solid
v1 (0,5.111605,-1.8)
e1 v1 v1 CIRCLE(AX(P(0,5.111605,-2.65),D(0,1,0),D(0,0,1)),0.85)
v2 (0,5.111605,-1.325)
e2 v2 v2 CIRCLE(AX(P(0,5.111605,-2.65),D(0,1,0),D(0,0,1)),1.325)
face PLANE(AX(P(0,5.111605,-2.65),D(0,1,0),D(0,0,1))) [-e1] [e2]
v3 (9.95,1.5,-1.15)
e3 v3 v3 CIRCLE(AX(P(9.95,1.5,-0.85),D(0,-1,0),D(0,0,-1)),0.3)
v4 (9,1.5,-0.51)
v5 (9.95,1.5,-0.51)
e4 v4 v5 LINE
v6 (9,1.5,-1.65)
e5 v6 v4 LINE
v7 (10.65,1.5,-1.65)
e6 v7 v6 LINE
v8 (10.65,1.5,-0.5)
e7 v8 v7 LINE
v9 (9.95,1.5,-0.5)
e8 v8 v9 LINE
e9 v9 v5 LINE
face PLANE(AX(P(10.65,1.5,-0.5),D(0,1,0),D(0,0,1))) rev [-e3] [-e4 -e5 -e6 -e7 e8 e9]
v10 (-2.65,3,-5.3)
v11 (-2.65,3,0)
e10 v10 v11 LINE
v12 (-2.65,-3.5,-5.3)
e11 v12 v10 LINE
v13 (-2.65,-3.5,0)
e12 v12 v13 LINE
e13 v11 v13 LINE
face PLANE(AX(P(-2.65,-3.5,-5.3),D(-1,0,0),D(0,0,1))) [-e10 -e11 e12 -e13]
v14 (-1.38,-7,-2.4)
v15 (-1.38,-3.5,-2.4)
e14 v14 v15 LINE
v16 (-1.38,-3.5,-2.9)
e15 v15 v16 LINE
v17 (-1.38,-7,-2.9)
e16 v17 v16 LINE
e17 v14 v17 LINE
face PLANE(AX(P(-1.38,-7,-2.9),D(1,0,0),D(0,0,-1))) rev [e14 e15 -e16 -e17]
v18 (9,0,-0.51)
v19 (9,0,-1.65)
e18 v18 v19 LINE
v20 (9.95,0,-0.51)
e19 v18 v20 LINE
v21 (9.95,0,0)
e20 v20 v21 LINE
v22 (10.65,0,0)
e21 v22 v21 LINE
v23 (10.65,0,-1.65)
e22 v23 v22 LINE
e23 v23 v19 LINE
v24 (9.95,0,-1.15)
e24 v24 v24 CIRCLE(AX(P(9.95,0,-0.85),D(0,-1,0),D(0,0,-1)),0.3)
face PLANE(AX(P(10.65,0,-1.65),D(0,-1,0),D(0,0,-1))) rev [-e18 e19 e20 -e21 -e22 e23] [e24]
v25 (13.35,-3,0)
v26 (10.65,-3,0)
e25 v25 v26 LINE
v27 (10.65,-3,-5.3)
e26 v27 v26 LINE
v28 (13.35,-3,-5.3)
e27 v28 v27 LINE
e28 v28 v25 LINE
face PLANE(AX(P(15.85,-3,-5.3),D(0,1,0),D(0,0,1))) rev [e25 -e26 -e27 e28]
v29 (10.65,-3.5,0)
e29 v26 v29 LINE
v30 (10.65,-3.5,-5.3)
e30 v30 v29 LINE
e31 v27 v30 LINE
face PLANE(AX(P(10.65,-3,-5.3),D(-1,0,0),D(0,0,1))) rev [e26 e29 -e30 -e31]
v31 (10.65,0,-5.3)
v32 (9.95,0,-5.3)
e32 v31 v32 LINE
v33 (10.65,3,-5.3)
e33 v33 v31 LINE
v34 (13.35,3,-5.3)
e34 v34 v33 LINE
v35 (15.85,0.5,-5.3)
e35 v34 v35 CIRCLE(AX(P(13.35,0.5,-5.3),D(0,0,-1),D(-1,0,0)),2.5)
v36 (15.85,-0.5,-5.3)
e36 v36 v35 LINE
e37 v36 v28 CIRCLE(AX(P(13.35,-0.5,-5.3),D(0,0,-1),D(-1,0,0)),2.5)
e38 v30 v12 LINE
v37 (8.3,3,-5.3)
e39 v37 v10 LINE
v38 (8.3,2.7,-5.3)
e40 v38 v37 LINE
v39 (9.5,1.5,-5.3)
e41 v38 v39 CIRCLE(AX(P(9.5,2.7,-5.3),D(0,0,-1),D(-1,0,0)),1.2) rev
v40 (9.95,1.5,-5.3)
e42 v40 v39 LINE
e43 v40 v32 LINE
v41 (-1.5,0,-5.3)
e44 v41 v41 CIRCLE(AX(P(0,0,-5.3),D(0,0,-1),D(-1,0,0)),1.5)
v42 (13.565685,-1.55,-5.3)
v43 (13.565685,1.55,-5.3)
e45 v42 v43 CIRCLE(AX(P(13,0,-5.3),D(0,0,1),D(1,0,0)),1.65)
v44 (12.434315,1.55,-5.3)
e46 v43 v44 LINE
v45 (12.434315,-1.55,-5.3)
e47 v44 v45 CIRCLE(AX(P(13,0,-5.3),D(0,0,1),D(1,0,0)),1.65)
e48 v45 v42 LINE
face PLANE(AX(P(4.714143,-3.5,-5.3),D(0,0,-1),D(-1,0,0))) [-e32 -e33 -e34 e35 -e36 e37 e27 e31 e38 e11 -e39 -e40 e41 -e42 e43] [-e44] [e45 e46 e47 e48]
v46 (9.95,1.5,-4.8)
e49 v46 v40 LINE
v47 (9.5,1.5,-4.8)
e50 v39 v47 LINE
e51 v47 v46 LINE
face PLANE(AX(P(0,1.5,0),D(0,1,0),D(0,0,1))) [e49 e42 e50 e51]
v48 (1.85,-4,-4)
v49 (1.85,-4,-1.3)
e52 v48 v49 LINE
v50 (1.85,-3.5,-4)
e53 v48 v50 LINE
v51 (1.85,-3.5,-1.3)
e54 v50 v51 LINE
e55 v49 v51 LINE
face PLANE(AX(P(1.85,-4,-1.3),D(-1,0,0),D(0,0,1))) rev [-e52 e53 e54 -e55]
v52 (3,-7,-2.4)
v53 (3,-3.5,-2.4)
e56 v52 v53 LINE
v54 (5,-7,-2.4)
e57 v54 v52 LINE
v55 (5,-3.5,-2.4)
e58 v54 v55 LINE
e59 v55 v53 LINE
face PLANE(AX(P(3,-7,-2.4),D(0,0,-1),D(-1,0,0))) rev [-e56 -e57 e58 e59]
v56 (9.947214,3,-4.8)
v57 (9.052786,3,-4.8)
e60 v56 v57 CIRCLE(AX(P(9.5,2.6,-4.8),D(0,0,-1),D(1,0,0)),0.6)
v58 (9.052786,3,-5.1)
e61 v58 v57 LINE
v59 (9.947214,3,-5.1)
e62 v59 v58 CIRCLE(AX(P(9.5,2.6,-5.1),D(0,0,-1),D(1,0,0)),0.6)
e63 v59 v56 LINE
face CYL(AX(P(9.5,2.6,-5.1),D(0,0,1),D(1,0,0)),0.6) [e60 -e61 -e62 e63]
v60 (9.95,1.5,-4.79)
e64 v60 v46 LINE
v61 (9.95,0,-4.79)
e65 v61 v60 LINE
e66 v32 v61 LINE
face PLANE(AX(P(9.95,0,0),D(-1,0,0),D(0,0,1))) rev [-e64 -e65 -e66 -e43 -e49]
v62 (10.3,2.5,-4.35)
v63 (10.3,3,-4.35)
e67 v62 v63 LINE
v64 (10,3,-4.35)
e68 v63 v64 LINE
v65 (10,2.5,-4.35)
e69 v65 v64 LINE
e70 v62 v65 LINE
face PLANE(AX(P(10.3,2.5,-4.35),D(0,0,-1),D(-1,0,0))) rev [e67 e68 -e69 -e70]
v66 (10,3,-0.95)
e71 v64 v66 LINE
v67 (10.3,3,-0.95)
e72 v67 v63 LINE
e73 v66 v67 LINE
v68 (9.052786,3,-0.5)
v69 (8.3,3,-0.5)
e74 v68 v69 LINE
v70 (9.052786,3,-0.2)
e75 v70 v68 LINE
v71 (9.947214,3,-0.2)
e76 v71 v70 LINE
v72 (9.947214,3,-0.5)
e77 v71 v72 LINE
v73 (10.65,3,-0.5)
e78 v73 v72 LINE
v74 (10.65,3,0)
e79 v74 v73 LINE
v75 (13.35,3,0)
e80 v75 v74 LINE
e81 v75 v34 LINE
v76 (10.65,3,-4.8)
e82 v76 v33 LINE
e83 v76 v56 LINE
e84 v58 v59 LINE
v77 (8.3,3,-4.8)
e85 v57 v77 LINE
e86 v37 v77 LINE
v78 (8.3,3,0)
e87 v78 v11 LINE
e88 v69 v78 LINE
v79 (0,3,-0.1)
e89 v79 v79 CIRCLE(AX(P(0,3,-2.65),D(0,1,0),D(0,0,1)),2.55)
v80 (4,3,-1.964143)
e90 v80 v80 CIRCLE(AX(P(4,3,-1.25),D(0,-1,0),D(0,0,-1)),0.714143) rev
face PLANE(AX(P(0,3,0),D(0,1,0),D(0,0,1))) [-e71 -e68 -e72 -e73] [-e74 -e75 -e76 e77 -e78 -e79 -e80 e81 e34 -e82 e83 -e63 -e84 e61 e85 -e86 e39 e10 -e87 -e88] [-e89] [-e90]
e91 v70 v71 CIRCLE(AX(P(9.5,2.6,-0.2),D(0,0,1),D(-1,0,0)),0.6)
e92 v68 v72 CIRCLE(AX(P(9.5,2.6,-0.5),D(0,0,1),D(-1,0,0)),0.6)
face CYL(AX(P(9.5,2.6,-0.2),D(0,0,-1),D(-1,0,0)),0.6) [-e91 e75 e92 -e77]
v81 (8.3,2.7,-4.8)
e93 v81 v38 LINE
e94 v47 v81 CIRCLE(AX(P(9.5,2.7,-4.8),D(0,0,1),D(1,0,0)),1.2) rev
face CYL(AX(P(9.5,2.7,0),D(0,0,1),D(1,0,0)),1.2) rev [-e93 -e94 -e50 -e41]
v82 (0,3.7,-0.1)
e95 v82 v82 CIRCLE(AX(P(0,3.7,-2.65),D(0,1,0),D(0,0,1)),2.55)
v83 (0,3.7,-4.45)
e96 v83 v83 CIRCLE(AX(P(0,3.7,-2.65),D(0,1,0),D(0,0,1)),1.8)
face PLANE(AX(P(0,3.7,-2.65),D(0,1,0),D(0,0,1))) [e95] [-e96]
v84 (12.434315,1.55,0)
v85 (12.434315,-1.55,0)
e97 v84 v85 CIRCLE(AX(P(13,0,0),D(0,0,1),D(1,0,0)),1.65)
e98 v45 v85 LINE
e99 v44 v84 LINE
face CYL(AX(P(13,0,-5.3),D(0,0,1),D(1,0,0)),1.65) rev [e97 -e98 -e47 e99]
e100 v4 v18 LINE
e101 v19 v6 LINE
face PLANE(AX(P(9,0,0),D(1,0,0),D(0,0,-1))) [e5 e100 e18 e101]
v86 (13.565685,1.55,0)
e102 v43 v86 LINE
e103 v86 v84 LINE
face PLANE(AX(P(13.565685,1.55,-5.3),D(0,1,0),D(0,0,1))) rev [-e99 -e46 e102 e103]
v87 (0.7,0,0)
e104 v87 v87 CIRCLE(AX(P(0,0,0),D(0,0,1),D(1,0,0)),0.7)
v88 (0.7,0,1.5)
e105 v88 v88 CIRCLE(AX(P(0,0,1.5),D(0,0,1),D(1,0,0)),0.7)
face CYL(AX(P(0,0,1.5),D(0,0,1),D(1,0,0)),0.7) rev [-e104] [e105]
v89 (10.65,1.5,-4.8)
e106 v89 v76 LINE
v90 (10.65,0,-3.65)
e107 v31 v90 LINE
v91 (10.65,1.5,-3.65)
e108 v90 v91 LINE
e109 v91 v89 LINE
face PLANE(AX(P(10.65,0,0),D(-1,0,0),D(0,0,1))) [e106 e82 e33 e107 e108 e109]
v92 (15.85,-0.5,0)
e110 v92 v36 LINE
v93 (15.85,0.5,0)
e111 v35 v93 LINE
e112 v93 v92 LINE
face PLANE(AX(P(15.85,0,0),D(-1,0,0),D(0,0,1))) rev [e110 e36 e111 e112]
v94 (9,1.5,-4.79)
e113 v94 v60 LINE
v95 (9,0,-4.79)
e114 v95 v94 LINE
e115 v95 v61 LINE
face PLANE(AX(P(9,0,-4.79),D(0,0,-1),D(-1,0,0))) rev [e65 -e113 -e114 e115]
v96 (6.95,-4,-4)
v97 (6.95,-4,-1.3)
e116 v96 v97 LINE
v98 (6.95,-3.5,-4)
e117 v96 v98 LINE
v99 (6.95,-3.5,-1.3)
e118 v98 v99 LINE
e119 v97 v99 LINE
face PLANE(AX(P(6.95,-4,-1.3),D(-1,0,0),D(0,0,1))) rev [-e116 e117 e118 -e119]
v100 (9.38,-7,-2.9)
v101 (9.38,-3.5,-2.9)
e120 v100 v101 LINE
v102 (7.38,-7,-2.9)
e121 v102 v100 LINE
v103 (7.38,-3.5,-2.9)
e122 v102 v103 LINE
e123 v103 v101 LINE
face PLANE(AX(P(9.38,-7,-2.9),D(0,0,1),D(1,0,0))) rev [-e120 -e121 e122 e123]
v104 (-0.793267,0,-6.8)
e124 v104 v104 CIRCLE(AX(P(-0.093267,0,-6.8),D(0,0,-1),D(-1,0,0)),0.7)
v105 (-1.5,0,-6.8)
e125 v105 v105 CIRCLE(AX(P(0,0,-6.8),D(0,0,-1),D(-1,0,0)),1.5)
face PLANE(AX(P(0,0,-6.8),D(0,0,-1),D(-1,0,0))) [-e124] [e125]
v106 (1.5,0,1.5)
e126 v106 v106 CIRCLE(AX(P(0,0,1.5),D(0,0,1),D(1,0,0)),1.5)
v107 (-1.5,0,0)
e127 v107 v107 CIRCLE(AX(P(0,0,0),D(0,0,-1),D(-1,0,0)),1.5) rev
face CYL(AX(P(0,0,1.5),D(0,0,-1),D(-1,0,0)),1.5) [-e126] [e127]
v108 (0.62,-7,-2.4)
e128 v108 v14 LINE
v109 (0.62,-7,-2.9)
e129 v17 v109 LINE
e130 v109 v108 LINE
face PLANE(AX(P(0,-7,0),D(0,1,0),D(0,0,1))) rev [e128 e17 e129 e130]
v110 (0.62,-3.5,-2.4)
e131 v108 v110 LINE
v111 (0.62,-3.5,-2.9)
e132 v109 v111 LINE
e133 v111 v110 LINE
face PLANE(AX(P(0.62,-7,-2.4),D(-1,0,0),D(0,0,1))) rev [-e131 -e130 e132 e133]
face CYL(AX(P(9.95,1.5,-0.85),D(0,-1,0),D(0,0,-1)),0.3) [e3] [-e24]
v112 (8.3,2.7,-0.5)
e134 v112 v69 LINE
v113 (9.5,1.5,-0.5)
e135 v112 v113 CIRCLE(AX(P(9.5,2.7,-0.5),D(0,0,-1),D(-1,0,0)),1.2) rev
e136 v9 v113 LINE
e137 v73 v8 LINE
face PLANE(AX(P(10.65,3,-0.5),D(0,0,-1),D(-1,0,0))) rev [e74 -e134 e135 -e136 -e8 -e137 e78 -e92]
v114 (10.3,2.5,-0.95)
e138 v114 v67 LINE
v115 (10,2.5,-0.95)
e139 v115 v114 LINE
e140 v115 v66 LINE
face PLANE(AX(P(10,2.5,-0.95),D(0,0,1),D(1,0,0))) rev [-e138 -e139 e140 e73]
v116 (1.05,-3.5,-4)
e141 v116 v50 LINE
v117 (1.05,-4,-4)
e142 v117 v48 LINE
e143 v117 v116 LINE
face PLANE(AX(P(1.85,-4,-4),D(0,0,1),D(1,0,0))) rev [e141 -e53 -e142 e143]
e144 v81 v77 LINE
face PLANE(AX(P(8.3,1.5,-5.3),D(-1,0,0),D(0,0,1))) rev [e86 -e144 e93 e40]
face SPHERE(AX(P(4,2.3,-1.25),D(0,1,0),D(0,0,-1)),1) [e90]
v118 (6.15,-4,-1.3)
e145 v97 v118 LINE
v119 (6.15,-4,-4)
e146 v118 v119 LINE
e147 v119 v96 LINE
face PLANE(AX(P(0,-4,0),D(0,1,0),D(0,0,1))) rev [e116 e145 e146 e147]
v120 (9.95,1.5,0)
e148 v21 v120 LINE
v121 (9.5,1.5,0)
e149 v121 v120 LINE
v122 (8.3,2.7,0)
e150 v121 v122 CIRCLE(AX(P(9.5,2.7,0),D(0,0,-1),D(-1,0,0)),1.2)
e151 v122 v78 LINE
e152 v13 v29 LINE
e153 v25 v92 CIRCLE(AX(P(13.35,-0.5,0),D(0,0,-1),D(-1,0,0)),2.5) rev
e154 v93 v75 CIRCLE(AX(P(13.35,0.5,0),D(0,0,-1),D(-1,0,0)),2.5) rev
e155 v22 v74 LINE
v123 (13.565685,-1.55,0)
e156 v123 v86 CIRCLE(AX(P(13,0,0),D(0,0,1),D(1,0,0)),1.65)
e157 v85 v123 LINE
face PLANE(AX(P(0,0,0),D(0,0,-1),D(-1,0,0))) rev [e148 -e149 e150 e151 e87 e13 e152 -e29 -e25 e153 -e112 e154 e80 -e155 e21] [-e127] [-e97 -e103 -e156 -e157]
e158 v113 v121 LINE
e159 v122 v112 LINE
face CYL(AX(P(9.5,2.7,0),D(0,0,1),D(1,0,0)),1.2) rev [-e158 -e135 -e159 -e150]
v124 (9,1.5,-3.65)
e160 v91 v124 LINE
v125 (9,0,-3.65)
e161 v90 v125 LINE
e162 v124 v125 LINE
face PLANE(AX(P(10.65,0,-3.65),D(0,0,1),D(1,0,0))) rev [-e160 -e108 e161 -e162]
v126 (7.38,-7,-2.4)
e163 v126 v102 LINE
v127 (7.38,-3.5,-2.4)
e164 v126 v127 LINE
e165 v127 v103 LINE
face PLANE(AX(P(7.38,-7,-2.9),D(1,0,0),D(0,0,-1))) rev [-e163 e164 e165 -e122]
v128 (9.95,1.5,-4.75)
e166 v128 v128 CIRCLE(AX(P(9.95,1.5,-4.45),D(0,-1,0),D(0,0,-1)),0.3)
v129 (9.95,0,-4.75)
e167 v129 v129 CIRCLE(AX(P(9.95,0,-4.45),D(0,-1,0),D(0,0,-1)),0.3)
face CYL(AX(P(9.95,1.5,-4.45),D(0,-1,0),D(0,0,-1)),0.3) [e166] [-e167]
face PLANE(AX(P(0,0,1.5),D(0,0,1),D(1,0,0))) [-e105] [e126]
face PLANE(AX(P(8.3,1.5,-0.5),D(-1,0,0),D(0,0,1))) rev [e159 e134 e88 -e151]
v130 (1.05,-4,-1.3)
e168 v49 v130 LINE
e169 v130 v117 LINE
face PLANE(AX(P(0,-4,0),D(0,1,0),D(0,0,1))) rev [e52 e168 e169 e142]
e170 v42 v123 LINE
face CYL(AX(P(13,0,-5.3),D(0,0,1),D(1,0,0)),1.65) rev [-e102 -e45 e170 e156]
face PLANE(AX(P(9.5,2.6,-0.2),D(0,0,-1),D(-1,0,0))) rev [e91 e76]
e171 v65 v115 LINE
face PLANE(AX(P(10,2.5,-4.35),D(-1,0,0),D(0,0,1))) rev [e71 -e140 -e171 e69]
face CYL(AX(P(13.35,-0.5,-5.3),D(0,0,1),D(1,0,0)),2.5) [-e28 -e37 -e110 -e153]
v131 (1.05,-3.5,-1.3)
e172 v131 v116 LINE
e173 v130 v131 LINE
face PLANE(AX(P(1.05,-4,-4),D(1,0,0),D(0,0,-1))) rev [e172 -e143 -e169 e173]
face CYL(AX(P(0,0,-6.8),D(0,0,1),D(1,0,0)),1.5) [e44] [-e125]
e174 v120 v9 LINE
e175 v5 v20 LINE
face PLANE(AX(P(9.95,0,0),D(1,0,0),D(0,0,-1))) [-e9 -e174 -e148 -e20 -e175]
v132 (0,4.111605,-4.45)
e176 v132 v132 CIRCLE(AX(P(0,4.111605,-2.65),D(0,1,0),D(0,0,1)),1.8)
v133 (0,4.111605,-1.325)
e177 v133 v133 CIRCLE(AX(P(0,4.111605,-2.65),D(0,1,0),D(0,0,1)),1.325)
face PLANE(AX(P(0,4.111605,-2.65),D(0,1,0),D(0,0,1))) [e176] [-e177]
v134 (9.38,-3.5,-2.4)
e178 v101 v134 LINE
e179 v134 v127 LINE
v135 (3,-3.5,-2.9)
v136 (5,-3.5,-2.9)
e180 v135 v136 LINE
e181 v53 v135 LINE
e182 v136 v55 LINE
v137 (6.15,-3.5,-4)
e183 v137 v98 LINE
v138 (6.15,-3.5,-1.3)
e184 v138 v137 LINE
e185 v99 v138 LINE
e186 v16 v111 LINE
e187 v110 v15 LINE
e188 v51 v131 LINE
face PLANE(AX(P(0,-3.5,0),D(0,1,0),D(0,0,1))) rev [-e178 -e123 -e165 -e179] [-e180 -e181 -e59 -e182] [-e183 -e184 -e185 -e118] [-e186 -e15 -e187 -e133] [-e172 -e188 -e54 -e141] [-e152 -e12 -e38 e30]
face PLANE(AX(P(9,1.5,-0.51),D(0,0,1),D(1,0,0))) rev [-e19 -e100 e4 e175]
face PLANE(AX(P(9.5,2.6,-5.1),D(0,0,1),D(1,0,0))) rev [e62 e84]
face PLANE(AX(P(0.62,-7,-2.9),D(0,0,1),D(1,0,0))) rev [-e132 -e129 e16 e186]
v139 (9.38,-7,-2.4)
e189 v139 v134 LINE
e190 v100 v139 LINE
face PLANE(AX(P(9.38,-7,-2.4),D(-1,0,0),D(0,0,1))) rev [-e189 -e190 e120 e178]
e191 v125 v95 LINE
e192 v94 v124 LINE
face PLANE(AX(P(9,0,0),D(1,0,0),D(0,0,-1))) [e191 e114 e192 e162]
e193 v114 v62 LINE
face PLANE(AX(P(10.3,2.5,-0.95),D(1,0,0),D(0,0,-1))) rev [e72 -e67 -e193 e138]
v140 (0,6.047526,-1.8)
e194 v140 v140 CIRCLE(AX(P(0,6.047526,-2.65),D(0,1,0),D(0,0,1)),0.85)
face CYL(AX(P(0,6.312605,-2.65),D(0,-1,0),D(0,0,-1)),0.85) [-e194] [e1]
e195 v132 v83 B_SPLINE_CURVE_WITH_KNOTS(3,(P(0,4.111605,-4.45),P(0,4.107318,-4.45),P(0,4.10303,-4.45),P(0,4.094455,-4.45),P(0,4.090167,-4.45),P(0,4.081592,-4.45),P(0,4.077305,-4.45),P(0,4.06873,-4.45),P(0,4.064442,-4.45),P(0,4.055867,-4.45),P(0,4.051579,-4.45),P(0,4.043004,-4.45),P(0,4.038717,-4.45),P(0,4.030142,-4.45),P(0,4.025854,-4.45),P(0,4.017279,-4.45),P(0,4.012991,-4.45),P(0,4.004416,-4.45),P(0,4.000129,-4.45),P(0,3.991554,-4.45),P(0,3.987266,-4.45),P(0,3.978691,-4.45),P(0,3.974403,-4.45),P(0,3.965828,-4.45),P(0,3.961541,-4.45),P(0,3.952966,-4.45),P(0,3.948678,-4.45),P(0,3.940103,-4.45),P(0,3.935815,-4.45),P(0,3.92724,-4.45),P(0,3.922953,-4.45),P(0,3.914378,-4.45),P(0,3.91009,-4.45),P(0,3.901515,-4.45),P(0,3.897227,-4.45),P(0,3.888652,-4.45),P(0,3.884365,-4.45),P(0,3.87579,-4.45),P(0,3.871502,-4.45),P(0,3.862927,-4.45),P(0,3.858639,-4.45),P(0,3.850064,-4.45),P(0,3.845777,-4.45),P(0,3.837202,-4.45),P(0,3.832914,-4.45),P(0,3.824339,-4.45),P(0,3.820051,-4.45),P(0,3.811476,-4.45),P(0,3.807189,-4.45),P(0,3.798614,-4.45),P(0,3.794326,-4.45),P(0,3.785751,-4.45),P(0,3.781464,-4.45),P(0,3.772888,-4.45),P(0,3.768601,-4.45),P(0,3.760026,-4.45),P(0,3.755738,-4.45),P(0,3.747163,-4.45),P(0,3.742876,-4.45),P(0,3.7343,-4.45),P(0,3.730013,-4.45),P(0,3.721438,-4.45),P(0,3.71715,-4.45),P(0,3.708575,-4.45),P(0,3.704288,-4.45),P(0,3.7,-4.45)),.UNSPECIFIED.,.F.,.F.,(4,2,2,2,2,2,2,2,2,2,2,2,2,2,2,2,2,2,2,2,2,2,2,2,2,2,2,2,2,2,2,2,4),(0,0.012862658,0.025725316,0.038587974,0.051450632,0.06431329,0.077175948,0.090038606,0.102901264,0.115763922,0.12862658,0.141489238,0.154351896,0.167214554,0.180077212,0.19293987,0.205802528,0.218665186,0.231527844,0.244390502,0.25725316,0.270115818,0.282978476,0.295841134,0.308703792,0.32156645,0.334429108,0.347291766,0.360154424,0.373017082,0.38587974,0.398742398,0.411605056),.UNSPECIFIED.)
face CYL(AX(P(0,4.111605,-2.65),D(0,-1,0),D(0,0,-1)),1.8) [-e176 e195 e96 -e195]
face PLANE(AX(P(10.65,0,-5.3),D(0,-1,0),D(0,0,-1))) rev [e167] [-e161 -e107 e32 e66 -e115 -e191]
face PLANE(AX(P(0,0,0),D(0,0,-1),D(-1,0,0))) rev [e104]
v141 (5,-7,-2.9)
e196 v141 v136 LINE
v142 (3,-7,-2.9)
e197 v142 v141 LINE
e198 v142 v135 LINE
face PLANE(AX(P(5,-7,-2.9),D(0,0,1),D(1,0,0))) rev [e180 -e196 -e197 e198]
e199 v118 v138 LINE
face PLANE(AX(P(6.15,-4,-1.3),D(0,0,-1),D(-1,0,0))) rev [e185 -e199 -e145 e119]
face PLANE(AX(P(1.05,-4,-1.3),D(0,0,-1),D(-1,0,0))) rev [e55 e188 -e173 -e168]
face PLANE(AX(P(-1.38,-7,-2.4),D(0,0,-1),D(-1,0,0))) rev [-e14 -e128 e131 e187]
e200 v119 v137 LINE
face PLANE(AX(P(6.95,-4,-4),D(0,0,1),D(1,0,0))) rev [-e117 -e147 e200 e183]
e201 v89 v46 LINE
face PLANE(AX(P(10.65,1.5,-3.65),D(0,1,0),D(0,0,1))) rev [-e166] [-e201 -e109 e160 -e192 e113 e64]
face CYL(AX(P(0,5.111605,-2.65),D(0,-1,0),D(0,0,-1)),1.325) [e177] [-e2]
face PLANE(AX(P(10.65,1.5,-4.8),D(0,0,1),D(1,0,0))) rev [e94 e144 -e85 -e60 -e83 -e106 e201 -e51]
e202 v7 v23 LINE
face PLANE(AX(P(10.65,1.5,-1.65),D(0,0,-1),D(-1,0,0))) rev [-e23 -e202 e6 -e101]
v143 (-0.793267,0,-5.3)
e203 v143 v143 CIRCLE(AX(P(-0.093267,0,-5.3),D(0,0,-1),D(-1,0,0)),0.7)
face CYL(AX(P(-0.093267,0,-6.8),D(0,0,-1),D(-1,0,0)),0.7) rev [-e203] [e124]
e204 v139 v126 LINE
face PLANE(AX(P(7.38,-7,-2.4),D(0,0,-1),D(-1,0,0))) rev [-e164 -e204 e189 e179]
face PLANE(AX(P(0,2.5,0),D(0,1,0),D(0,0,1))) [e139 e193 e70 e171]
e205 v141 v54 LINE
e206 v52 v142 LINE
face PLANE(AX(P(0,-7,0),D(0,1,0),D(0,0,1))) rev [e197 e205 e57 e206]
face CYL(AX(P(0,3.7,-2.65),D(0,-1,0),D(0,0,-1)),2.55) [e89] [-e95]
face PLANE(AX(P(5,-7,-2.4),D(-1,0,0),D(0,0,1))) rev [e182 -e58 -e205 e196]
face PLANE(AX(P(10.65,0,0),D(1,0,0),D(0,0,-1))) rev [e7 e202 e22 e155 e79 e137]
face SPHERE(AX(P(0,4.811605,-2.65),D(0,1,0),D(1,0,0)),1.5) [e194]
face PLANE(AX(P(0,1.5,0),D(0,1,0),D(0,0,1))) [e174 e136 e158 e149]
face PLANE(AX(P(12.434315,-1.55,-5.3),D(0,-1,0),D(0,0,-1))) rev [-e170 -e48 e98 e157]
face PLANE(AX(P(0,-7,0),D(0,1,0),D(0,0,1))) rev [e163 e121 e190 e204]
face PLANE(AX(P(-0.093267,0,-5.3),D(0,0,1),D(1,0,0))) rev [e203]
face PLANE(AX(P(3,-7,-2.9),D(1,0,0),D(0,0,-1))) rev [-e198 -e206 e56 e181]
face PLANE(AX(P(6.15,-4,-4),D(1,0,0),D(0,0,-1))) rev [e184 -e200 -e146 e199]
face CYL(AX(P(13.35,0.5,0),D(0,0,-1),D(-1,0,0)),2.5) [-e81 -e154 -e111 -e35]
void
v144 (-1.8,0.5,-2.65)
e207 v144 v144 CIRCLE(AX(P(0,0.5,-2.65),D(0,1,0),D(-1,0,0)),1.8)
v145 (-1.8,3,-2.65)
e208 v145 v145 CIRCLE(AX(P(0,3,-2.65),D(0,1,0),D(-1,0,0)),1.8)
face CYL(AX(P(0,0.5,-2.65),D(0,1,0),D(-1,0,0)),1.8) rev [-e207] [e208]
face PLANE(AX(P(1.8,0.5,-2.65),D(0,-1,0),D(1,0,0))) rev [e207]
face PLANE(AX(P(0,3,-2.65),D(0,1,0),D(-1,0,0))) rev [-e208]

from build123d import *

# Parameters (mm, degrees)
BOSS_EXTRUDE1_START            = -6.5
BOSS_EXTRUDE1_OUTLINE_W        = 7.364142843
BOSS_EXTRUDE1_OUTLINE_H        = 4.764142843
BOSS_EXTRUDE1_DEPTH            = 6.5
SKETCH2_W                      = 7.364142843
SKETCH2_H                      = 6.5
BOSS_EXTRUDE2_DEPTH            = 0.535857157
SKETCH3_W                      = 5.3
SKETCH3_H                      = 6.5
BOSS_EXTRUDE3_DEPTH            = 11.135857157
CUT_EXTRUDE1_DEPTH             = 0.7
SKETCH5_W                      = 1.14
SKETCH5_H                      = 1.5
CUT_EXTRUDE2_DEPTH             = 0.95
CUT_EXTRUDE3_DEPTH             = 0.7
SKETCH7_W                      = 1.14
SKETCH7_H                      = 1.5
CUT_EXTRUDE4_DEPTH             = 0.95
SKETCH8_W                      = 5.2
SKETCH8_H                      = 0.5
CUT_EXTRUDE5_DEPTH             = 18.075201317
CUT_EXTRUDE6_DEPTH             = 18.075201317
SKETCH10_W                     = 2
SKETCH10_H                     = 0.5
BOSS_EXTRUDE4_DEPTH            = 3.5
SKETCH11_W                     = 2
SKETCH11_H                     = 0.5
BOSS_EXTRUDE5_DEPTH            = 3.5
SKETCH12_W                     = 2
SKETCH12_H                     = 0.5
BOSS_EXTRUDE6_DEPTH            = 3.5
SKETCH13_W                     = 0.8
SKETCH13_H                     = 2.7
BOSS_EXTRUDE7_DEPTH            = 0.5
SKETCH14_W                     = 0.8
SKETCH14_H                     = 2.7
BOSS_EXTRUDE8_DEPTH            = 0.5
SKETCH15_R                     = 2.55
BOSS_EXTRUDE9_DEPTH            = 0.7
SKETCH16_R                     = 1.8
BOSS_EXTRUDE10_DEPTH           = 0.411605056
SKETCH17_R                     = 1.325
BOSS_EXTRUDE11_DEPTH           = 1
BOSS_EXTRUDE12_REACH           = 22.64
BOSS_EXTRUDE12_END_RADIUS      = 1.5
SKETCH18_R                     = 0.85
SKETCH19_R                     = 1.5
BOSS_EXTRUDE13_DEPTH           = 1.5
BOSS_EXTRUDE14_START           = 1.5
SKETCH20_R                     = 1.5
BOSS_EXTRUDE14_DEPTH           = 1.5
SKETCH21_W                     = 1.65
SKETCH21_H                     = 0.5
CUT_EXTRUDE7_DEPTH             = 1.5
SKETCH22_W                     = 1.65
SKETCH22_H                     = 0.5
CUT_EXTRUDE8_DEPTH             = 1.5
BOSS_EXTRUDE15_DEPTH           = 0.3
BOSS_EXTRUDE16_START           = 0.3
BOSS_EXTRUDE16_DEPTH           = 0.3
SKETCH25_W                     = 0.29999989
SKETCH25_H                     = 3.4
CUT_EXTRUDE9_DEPTH             = 0.5
SKETCH26_W                     = 1.8
SKETCH26_H                     = 2.5
SKETCH27_W                     = 0.3
SKETCH27_H                     = 1.5
SKETCH28_W                     = 0.3
SKETCH28_H                     = 1.5
F_1_4_1_4_DIAMETER_HOLE1_D     = 1.4
F_1_4_1_4_DIAMETER_HOLE1_DEPTH = 1.5
F_1_4_1_4_DIAMETER_HOLE2_D     = 1.4
F_1_4_1_4_DIAMETER_HOLE2_DEPTH = 1.5
FILLET1_R                      = 1.2
FILLET2_R                      = 2.5


with BuildPart() as part:
    # Boss-Extrude1: read off the stored shape, not the designer's step
    # Boss-Extrude1 outline → Boss-Extrude1 (new body)
    with BuildSketch(Plane(origin=(0, 3, 0), x_dir=(1, 0, 0), z_dir=(0, 1, 0)).offset(BOSS_EXTRUDE1_START)):
        with Locations((1.032071421, 2.917928579)):
            Rectangle(BOSS_EXTRUDE1_OUTLINE_W, BOSS_EXTRUDE1_OUTLINE_H)
    extrude(amount=BOSS_EXTRUDE1_DEPTH)

    # Boss-Extrude1 2 outline → Boss-Extrude1 2 (revolve)
    with BuildSketch(Plane(origin=(4, 0, -1.25), x_dir=(1, 0, 0), z_dir=(0, 0, 1))):
        with BuildLine():
            Line((0, 2.999999999), (0.714142844, 2.999999999))
            ThreePointArc((0.714142844, 2.999999999), (0.387298335, 3.221954446), (0, 3.3))
            Line((0, 3.3), (0, 2.999999999))
        make_face()
    revolve(axis=Axis((4, 0, -1.25), (0, 1, 0)))

    # Sketch2 → Boss-Extrude2 (add)
    with BuildSketch(Plane.XY.offset(-0.535857157)):
        with Locations((1.032071421, -0.25)):
            Rectangle(SKETCH2_W, SKETCH2_H)
    extrude(amount=BOSS_EXTRUDE2_DEPTH)

    # Sketch3 → Boss-Extrude3 (add)
    with BuildSketch(Plane(origin=(4.714142843, 0, 0), x_dir=(0, 0, -1), z_dir=(1, 0, 0))):
        with Locations((2.65, -0.25)):
            Rectangle(SKETCH3_W, SKETCH3_H)
    extrude(amount=BOSS_EXTRUDE3_DEPTH)

    # Sketch4 → Cut-Extrude1 (cut)
    with BuildSketch(Plane(origin=(9.95, 0, 0), x_dir=(0, -1, 0), z_dir=(-1, 0, 0))):
        Polygon((-1.5, -0.5), (-1.5, -1.65), (0, -1.65), (0, 0), (-3, 0), (-3, -0.5), align=None)
    extrude(amount=-CUT_EXTRUDE1_DEPTH, mode=Mode.SUBTRACT)

    # Sketch5 → Cut-Extrude2 (cut)
    with BuildSketch(Plane(origin=(9.95, 0, 0), x_dir=(0, 0, -1), z_dir=(1, 0, 0))):
        with Locations((1.08, 0.75)):
            Rectangle(SKETCH5_W, SKETCH5_H)
    extrude(amount=-CUT_EXTRUDE2_DEPTH, mode=Mode.SUBTRACT)

    # Sketch6 → Cut-Extrude3 (cut)
    with BuildSketch(Plane(origin=(9.95, 0, 0), x_dir=(0, -1, 0), z_dir=(-1, 0, 0))):
        Polygon((-3, -5.3), (0, -5.3), (0, -3.65), (-1.5, -3.65), (-1.5, -4.8), (-3, -4.8), align=None)
    extrude(amount=-CUT_EXTRUDE3_DEPTH, mode=Mode.SUBTRACT)

    # Sketch7 → Cut-Extrude4 (cut)
    with BuildSketch(Plane(origin=(9.95, 0, 0), x_dir=(0, 0, -1), z_dir=(1, 0, 0))):
        with Locations((4.22, 0.75)):
            Rectangle(SKETCH7_W, SKETCH7_H)
    extrude(amount=-CUT_EXTRUDE4_DEPTH, mode=Mode.SUBTRACT)

    # Sketch8 → Cut-Extrude5 (cut, through all)
    with BuildSketch(Plane.XY):
        with Locations((13.25, -3.25)):
            Rectangle(SKETCH8_W, SKETCH8_H)
    extrude(amount=-CUT_EXTRUDE5_DEPTH, mode=Mode.SUBTRACT)

    # Sketch9 → Cut-Extrude6 (cut, through all)
    with BuildSketch(Plane.XY):
        with BuildLine():
            Line((13.565685425, 1.55), (12.434314575, 1.55))
            ThreePointArc((12.434314575, 1.55), (11.35, 0), (12.434314575, -1.55))
            Line((12.434314575, -1.55), (13.565685425, -1.55))
            ThreePointArc((13.565685425, -1.55), (14.65, 0), (13.565685425, 1.55))
        make_face()
    extrude(amount=-CUT_EXTRUDE6_DEPTH, mode=Mode.SUBTRACT)

    # Sketch10 → Boss-Extrude4 (add)
    with BuildSketch(Plane.XZ.offset(3.5)):
        with Locations((-0.38, -2.65)):
            Rectangle(SKETCH10_W, SKETCH10_H)
    extrude(amount=BOSS_EXTRUDE4_DEPTH)

    # Sketch11 → Boss-Extrude5 (add)
    with BuildSketch(Plane.XZ.offset(3.5)):
        with Locations((4, -2.65)):
            Rectangle(SKETCH11_W, SKETCH11_H)
    extrude(amount=BOSS_EXTRUDE5_DEPTH)

    # Sketch12 → Boss-Extrude6 (add)
    with BuildSketch(Plane.XZ.offset(3.5)):
        with Locations((8.38, -2.65)):
            Rectangle(SKETCH12_W, SKETCH12_H)
    extrude(amount=BOSS_EXTRUDE6_DEPTH)

    # Sketch13 → Boss-Extrude7 (add)
    with BuildSketch(Plane.XZ.offset(3.5)):
        with Locations((1.45, -2.65)):
            Rectangle(SKETCH13_W, SKETCH13_H)
    extrude(amount=BOSS_EXTRUDE7_DEPTH)

    # Sketch14 → Boss-Extrude8 (add)
    with BuildSketch(Plane.XZ.offset(3.5)):
        with Locations((6.55, -2.65)):
            Rectangle(SKETCH14_W, SKETCH14_H)
    extrude(amount=BOSS_EXTRUDE8_DEPTH)

    # Sketch15 → Boss-Extrude9 (add)
    with BuildSketch(Plane(origin=(0, 3, 0), x_dir=(-1, 0, 0), z_dir=(0, 1, 0))):
        with Locations(Location((0, -2.65, 0), (0, 0, 90))):
            Circle(SKETCH15_R)
    extrude(amount=BOSS_EXTRUDE9_DEPTH)

    # Sketch16 → Boss-Extrude10 (add)
    with BuildSketch(Plane(origin=(0, 3.7, 0), x_dir=(-1, 0, 0), z_dir=(0, 1, 0))):
        with Locations(Location((0, -2.65, 0), (0, 0, 270))):
            Circle(SKETCH16_R)
    extrude(amount=BOSS_EXTRUDE10_DEPTH)

    # Sketch17 → Boss-Extrude11 (add)
    with BuildSketch(Plane(origin=(0, 4.111605056, 0), x_dir=(-1, 0, 0), z_dir=(0, 1, 0))):
        with Locations(Location((0, -2.65, 0), (0, 0, 90))):
            Circle(SKETCH17_R)
    extrude(amount=BOSS_EXTRUDE11_DEPTH)

    # Boss-Extrude12: up to this sphere (the profile starts inside it)
    boss_extrude12_end = Location((0, 4.811605056, -2.65)) * Sphere(BOSS_EXTRUDE12_END_RADIUS, mode=Mode.PRIVATE)
    # Sketch18 → Boss-Extrude12 (add, up to the surface)
    with BuildSketch(Plane(origin=(0, 5.111605056, 0), x_dir=(-1, 0, 0), z_dir=(0, 1, 0)), mode=Mode.PRIVATE) as boss_extrude12_sk1:
        with Locations(Location((0, -2.65, 0), (0, 0, 90))):
            Circle(SKETCH18_R)
    boss_extrude12_tool1 = extrude(boss_extrude12_sk1.sketch, amount=BOSS_EXTRUDE12_REACH, mode=Mode.PRIVATE) & boss_extrude12_end
    add(boss_extrude12_tool1.solids().sort_by_distance((0, 5.111605, -2.65))[0])

    # Sketch19 → Boss-Extrude13 (add)
    with BuildSketch(Plane.XY):
        with Locations(Location((0, 0, 0), (0, 0, 180))):
            Circle(SKETCH19_R)
    extrude(amount=BOSS_EXTRUDE13_DEPTH)

    # Sketch20 → Boss-Extrude14 (add)
    with BuildSketch(Plane(origin=(0, 0, -5.3), x_dir=(-1, 0, 0), z_dir=(0, 0, -1)).offset(BOSS_EXTRUDE14_START)):
        Circle(SKETCH20_R)
    extrude(amount=-BOSS_EXTRUDE14_DEPTH)

    # Sketch21 → Cut-Extrude7 (cut)
    with BuildSketch(Plane(origin=(0, 3, 0), x_dir=(-1, 0, 0), z_dir=(0, 1, 0))):
        with Locations((-9.125, -0.25)):
            Rectangle(SKETCH21_W, SKETCH21_H)
    extrude(amount=-CUT_EXTRUDE7_DEPTH, mode=Mode.SUBTRACT)

    # Sketch22 → Cut-Extrude8 (cut)
    with BuildSketch(Plane(origin=(0, 3, 0), x_dir=(-1, 0, 0), z_dir=(0, 1, 0))):
        with Locations((-9.125, -5.05)):
            Rectangle(SKETCH22_W, SKETCH22_H)
    extrude(amount=-CUT_EXTRUDE8_DEPTH, mode=Mode.SUBTRACT)

    # Sketch23 → Boss-Extrude15 (add)
    with BuildSketch(Plane.XY.offset(-0.5)):
        with BuildLine():
            Line((9.052786405, 3), (9.947213595, 3))
            ThreePointArc((9.947213595, 3), (9.5, 2), (9.052786405, 3))
        make_face()
    extrude(amount=BOSS_EXTRUDE15_DEPTH)

    # Sketch24 → Boss-Extrude16 (add)
    with BuildSketch(Plane(origin=(0, 0, -4.8), x_dir=(-1, 0, 0), z_dir=(0, 0, -1)).offset(BOSS_EXTRUDE16_START)):
        with BuildLine():
            Line((-9.947213595, 3), (-9.052786405, 3))
            ThreePointArc((-9.052786405, 3), (-9.5, 2), (-9.947213595, 3))
        make_face()
    extrude(amount=-BOSS_EXTRUDE16_DEPTH)

    # Sketch25 → Cut-Extrude9 (cut)
    with BuildSketch(Plane(origin=(0, 3, 0), x_dir=(-1, 0, 0), z_dir=(0, 1, 0))):
        with Locations((-10.149999945, -2.65)):
            Rectangle(SKETCH25_W, SKETCH25_H)
    extrude(amount=-CUT_EXTRUDE9_DEPTH, mode=Mode.SUBTRACT)

    # Sketch26 → Cut-Revolve1 (revolve, cut)
    with BuildSketch(Plane(origin=(0, 0, -2.65), x_dir=(-1, 0, 0), z_dir=(0, 0, -1))):
        with Locations((-0.9, 1.75)):
            Rectangle(SKETCH26_W, SKETCH26_H)
    revolve(axis=Axis((0, 0.5, -2.65), (0, 1, 0)), mode=Mode.SUBTRACT)

    # Sketch27 → Revolve1 (revolve)
    with BuildSketch(Plane.XY.offset(-4.45), mode=Mode.PRIVATE) as revolve1_sk:
        with Locations((10.1, 0.75)):
            Rectangle(SKETCH27_W, SKETCH27_H)
    revolve(revolve1_sk.sketch.rotate(Axis((9.95, 1.5, -4.45), (0, -1, 0)), 270), axis=Axis((9.95, 1.5, -4.45), (0, -1, 0)))

    # Sketch28 → Revolve2 (revolve)
    with BuildSketch(Plane.XY.offset(-0.85), mode=Mode.PRIVATE) as revolve2_sk:
        with Locations((10.1, 0.75)):
            Rectangle(SKETCH28_W, SKETCH28_H)
    revolve(revolve2_sk.sketch.rotate(Axis((9.95, 1.5, -0.85), (0, -1, 0)), 270), axis=Axis((9.95, 1.5, -0.85), (0, -1, 0)))

    # Ø1.4 (1.4) Diameter Hole1
    with Locations(Plane(origin=(0, 0, -6.8), x_dir=(-1, 0, 0), z_dir=(0, 0, -1))):
        with Locations((0.093266982, 0)):
            Hole(F_1_4_1_4_DIAMETER_HOLE1_D / 2, depth=F_1_4_1_4_DIAMETER_HOLE1_DEPTH)

    # Ø1.4 (1.4) Diameter Hole2
    with Locations(Plane.XY.offset(1.5)):
        with Locations((0, 0)):
            Hole(F_1_4_1_4_DIAMETER_HOLE2_D / 2, depth=F_1_4_1_4_DIAMETER_HOLE2_DEPTH)

    # Fillet1
    fillet1_edges = [part.edges().sort_by_distance(p)[0] for p in [
        (8.3, 1.5, -0.25),
        (8.3, 1.5, -5.05),
    ]]
    fillet(fillet1_edges, radius=FILLET1_R)

    # Fillet2
    fillet2_edges = [part.edges().sort_by_distance(p)[0] for p in [
        (15.85, 3, -2.65),
        (15.85, -3, -2.65),
    ]]
    fillet(fillet2_edges, radius=FILLET2_R)


solid = part.part
